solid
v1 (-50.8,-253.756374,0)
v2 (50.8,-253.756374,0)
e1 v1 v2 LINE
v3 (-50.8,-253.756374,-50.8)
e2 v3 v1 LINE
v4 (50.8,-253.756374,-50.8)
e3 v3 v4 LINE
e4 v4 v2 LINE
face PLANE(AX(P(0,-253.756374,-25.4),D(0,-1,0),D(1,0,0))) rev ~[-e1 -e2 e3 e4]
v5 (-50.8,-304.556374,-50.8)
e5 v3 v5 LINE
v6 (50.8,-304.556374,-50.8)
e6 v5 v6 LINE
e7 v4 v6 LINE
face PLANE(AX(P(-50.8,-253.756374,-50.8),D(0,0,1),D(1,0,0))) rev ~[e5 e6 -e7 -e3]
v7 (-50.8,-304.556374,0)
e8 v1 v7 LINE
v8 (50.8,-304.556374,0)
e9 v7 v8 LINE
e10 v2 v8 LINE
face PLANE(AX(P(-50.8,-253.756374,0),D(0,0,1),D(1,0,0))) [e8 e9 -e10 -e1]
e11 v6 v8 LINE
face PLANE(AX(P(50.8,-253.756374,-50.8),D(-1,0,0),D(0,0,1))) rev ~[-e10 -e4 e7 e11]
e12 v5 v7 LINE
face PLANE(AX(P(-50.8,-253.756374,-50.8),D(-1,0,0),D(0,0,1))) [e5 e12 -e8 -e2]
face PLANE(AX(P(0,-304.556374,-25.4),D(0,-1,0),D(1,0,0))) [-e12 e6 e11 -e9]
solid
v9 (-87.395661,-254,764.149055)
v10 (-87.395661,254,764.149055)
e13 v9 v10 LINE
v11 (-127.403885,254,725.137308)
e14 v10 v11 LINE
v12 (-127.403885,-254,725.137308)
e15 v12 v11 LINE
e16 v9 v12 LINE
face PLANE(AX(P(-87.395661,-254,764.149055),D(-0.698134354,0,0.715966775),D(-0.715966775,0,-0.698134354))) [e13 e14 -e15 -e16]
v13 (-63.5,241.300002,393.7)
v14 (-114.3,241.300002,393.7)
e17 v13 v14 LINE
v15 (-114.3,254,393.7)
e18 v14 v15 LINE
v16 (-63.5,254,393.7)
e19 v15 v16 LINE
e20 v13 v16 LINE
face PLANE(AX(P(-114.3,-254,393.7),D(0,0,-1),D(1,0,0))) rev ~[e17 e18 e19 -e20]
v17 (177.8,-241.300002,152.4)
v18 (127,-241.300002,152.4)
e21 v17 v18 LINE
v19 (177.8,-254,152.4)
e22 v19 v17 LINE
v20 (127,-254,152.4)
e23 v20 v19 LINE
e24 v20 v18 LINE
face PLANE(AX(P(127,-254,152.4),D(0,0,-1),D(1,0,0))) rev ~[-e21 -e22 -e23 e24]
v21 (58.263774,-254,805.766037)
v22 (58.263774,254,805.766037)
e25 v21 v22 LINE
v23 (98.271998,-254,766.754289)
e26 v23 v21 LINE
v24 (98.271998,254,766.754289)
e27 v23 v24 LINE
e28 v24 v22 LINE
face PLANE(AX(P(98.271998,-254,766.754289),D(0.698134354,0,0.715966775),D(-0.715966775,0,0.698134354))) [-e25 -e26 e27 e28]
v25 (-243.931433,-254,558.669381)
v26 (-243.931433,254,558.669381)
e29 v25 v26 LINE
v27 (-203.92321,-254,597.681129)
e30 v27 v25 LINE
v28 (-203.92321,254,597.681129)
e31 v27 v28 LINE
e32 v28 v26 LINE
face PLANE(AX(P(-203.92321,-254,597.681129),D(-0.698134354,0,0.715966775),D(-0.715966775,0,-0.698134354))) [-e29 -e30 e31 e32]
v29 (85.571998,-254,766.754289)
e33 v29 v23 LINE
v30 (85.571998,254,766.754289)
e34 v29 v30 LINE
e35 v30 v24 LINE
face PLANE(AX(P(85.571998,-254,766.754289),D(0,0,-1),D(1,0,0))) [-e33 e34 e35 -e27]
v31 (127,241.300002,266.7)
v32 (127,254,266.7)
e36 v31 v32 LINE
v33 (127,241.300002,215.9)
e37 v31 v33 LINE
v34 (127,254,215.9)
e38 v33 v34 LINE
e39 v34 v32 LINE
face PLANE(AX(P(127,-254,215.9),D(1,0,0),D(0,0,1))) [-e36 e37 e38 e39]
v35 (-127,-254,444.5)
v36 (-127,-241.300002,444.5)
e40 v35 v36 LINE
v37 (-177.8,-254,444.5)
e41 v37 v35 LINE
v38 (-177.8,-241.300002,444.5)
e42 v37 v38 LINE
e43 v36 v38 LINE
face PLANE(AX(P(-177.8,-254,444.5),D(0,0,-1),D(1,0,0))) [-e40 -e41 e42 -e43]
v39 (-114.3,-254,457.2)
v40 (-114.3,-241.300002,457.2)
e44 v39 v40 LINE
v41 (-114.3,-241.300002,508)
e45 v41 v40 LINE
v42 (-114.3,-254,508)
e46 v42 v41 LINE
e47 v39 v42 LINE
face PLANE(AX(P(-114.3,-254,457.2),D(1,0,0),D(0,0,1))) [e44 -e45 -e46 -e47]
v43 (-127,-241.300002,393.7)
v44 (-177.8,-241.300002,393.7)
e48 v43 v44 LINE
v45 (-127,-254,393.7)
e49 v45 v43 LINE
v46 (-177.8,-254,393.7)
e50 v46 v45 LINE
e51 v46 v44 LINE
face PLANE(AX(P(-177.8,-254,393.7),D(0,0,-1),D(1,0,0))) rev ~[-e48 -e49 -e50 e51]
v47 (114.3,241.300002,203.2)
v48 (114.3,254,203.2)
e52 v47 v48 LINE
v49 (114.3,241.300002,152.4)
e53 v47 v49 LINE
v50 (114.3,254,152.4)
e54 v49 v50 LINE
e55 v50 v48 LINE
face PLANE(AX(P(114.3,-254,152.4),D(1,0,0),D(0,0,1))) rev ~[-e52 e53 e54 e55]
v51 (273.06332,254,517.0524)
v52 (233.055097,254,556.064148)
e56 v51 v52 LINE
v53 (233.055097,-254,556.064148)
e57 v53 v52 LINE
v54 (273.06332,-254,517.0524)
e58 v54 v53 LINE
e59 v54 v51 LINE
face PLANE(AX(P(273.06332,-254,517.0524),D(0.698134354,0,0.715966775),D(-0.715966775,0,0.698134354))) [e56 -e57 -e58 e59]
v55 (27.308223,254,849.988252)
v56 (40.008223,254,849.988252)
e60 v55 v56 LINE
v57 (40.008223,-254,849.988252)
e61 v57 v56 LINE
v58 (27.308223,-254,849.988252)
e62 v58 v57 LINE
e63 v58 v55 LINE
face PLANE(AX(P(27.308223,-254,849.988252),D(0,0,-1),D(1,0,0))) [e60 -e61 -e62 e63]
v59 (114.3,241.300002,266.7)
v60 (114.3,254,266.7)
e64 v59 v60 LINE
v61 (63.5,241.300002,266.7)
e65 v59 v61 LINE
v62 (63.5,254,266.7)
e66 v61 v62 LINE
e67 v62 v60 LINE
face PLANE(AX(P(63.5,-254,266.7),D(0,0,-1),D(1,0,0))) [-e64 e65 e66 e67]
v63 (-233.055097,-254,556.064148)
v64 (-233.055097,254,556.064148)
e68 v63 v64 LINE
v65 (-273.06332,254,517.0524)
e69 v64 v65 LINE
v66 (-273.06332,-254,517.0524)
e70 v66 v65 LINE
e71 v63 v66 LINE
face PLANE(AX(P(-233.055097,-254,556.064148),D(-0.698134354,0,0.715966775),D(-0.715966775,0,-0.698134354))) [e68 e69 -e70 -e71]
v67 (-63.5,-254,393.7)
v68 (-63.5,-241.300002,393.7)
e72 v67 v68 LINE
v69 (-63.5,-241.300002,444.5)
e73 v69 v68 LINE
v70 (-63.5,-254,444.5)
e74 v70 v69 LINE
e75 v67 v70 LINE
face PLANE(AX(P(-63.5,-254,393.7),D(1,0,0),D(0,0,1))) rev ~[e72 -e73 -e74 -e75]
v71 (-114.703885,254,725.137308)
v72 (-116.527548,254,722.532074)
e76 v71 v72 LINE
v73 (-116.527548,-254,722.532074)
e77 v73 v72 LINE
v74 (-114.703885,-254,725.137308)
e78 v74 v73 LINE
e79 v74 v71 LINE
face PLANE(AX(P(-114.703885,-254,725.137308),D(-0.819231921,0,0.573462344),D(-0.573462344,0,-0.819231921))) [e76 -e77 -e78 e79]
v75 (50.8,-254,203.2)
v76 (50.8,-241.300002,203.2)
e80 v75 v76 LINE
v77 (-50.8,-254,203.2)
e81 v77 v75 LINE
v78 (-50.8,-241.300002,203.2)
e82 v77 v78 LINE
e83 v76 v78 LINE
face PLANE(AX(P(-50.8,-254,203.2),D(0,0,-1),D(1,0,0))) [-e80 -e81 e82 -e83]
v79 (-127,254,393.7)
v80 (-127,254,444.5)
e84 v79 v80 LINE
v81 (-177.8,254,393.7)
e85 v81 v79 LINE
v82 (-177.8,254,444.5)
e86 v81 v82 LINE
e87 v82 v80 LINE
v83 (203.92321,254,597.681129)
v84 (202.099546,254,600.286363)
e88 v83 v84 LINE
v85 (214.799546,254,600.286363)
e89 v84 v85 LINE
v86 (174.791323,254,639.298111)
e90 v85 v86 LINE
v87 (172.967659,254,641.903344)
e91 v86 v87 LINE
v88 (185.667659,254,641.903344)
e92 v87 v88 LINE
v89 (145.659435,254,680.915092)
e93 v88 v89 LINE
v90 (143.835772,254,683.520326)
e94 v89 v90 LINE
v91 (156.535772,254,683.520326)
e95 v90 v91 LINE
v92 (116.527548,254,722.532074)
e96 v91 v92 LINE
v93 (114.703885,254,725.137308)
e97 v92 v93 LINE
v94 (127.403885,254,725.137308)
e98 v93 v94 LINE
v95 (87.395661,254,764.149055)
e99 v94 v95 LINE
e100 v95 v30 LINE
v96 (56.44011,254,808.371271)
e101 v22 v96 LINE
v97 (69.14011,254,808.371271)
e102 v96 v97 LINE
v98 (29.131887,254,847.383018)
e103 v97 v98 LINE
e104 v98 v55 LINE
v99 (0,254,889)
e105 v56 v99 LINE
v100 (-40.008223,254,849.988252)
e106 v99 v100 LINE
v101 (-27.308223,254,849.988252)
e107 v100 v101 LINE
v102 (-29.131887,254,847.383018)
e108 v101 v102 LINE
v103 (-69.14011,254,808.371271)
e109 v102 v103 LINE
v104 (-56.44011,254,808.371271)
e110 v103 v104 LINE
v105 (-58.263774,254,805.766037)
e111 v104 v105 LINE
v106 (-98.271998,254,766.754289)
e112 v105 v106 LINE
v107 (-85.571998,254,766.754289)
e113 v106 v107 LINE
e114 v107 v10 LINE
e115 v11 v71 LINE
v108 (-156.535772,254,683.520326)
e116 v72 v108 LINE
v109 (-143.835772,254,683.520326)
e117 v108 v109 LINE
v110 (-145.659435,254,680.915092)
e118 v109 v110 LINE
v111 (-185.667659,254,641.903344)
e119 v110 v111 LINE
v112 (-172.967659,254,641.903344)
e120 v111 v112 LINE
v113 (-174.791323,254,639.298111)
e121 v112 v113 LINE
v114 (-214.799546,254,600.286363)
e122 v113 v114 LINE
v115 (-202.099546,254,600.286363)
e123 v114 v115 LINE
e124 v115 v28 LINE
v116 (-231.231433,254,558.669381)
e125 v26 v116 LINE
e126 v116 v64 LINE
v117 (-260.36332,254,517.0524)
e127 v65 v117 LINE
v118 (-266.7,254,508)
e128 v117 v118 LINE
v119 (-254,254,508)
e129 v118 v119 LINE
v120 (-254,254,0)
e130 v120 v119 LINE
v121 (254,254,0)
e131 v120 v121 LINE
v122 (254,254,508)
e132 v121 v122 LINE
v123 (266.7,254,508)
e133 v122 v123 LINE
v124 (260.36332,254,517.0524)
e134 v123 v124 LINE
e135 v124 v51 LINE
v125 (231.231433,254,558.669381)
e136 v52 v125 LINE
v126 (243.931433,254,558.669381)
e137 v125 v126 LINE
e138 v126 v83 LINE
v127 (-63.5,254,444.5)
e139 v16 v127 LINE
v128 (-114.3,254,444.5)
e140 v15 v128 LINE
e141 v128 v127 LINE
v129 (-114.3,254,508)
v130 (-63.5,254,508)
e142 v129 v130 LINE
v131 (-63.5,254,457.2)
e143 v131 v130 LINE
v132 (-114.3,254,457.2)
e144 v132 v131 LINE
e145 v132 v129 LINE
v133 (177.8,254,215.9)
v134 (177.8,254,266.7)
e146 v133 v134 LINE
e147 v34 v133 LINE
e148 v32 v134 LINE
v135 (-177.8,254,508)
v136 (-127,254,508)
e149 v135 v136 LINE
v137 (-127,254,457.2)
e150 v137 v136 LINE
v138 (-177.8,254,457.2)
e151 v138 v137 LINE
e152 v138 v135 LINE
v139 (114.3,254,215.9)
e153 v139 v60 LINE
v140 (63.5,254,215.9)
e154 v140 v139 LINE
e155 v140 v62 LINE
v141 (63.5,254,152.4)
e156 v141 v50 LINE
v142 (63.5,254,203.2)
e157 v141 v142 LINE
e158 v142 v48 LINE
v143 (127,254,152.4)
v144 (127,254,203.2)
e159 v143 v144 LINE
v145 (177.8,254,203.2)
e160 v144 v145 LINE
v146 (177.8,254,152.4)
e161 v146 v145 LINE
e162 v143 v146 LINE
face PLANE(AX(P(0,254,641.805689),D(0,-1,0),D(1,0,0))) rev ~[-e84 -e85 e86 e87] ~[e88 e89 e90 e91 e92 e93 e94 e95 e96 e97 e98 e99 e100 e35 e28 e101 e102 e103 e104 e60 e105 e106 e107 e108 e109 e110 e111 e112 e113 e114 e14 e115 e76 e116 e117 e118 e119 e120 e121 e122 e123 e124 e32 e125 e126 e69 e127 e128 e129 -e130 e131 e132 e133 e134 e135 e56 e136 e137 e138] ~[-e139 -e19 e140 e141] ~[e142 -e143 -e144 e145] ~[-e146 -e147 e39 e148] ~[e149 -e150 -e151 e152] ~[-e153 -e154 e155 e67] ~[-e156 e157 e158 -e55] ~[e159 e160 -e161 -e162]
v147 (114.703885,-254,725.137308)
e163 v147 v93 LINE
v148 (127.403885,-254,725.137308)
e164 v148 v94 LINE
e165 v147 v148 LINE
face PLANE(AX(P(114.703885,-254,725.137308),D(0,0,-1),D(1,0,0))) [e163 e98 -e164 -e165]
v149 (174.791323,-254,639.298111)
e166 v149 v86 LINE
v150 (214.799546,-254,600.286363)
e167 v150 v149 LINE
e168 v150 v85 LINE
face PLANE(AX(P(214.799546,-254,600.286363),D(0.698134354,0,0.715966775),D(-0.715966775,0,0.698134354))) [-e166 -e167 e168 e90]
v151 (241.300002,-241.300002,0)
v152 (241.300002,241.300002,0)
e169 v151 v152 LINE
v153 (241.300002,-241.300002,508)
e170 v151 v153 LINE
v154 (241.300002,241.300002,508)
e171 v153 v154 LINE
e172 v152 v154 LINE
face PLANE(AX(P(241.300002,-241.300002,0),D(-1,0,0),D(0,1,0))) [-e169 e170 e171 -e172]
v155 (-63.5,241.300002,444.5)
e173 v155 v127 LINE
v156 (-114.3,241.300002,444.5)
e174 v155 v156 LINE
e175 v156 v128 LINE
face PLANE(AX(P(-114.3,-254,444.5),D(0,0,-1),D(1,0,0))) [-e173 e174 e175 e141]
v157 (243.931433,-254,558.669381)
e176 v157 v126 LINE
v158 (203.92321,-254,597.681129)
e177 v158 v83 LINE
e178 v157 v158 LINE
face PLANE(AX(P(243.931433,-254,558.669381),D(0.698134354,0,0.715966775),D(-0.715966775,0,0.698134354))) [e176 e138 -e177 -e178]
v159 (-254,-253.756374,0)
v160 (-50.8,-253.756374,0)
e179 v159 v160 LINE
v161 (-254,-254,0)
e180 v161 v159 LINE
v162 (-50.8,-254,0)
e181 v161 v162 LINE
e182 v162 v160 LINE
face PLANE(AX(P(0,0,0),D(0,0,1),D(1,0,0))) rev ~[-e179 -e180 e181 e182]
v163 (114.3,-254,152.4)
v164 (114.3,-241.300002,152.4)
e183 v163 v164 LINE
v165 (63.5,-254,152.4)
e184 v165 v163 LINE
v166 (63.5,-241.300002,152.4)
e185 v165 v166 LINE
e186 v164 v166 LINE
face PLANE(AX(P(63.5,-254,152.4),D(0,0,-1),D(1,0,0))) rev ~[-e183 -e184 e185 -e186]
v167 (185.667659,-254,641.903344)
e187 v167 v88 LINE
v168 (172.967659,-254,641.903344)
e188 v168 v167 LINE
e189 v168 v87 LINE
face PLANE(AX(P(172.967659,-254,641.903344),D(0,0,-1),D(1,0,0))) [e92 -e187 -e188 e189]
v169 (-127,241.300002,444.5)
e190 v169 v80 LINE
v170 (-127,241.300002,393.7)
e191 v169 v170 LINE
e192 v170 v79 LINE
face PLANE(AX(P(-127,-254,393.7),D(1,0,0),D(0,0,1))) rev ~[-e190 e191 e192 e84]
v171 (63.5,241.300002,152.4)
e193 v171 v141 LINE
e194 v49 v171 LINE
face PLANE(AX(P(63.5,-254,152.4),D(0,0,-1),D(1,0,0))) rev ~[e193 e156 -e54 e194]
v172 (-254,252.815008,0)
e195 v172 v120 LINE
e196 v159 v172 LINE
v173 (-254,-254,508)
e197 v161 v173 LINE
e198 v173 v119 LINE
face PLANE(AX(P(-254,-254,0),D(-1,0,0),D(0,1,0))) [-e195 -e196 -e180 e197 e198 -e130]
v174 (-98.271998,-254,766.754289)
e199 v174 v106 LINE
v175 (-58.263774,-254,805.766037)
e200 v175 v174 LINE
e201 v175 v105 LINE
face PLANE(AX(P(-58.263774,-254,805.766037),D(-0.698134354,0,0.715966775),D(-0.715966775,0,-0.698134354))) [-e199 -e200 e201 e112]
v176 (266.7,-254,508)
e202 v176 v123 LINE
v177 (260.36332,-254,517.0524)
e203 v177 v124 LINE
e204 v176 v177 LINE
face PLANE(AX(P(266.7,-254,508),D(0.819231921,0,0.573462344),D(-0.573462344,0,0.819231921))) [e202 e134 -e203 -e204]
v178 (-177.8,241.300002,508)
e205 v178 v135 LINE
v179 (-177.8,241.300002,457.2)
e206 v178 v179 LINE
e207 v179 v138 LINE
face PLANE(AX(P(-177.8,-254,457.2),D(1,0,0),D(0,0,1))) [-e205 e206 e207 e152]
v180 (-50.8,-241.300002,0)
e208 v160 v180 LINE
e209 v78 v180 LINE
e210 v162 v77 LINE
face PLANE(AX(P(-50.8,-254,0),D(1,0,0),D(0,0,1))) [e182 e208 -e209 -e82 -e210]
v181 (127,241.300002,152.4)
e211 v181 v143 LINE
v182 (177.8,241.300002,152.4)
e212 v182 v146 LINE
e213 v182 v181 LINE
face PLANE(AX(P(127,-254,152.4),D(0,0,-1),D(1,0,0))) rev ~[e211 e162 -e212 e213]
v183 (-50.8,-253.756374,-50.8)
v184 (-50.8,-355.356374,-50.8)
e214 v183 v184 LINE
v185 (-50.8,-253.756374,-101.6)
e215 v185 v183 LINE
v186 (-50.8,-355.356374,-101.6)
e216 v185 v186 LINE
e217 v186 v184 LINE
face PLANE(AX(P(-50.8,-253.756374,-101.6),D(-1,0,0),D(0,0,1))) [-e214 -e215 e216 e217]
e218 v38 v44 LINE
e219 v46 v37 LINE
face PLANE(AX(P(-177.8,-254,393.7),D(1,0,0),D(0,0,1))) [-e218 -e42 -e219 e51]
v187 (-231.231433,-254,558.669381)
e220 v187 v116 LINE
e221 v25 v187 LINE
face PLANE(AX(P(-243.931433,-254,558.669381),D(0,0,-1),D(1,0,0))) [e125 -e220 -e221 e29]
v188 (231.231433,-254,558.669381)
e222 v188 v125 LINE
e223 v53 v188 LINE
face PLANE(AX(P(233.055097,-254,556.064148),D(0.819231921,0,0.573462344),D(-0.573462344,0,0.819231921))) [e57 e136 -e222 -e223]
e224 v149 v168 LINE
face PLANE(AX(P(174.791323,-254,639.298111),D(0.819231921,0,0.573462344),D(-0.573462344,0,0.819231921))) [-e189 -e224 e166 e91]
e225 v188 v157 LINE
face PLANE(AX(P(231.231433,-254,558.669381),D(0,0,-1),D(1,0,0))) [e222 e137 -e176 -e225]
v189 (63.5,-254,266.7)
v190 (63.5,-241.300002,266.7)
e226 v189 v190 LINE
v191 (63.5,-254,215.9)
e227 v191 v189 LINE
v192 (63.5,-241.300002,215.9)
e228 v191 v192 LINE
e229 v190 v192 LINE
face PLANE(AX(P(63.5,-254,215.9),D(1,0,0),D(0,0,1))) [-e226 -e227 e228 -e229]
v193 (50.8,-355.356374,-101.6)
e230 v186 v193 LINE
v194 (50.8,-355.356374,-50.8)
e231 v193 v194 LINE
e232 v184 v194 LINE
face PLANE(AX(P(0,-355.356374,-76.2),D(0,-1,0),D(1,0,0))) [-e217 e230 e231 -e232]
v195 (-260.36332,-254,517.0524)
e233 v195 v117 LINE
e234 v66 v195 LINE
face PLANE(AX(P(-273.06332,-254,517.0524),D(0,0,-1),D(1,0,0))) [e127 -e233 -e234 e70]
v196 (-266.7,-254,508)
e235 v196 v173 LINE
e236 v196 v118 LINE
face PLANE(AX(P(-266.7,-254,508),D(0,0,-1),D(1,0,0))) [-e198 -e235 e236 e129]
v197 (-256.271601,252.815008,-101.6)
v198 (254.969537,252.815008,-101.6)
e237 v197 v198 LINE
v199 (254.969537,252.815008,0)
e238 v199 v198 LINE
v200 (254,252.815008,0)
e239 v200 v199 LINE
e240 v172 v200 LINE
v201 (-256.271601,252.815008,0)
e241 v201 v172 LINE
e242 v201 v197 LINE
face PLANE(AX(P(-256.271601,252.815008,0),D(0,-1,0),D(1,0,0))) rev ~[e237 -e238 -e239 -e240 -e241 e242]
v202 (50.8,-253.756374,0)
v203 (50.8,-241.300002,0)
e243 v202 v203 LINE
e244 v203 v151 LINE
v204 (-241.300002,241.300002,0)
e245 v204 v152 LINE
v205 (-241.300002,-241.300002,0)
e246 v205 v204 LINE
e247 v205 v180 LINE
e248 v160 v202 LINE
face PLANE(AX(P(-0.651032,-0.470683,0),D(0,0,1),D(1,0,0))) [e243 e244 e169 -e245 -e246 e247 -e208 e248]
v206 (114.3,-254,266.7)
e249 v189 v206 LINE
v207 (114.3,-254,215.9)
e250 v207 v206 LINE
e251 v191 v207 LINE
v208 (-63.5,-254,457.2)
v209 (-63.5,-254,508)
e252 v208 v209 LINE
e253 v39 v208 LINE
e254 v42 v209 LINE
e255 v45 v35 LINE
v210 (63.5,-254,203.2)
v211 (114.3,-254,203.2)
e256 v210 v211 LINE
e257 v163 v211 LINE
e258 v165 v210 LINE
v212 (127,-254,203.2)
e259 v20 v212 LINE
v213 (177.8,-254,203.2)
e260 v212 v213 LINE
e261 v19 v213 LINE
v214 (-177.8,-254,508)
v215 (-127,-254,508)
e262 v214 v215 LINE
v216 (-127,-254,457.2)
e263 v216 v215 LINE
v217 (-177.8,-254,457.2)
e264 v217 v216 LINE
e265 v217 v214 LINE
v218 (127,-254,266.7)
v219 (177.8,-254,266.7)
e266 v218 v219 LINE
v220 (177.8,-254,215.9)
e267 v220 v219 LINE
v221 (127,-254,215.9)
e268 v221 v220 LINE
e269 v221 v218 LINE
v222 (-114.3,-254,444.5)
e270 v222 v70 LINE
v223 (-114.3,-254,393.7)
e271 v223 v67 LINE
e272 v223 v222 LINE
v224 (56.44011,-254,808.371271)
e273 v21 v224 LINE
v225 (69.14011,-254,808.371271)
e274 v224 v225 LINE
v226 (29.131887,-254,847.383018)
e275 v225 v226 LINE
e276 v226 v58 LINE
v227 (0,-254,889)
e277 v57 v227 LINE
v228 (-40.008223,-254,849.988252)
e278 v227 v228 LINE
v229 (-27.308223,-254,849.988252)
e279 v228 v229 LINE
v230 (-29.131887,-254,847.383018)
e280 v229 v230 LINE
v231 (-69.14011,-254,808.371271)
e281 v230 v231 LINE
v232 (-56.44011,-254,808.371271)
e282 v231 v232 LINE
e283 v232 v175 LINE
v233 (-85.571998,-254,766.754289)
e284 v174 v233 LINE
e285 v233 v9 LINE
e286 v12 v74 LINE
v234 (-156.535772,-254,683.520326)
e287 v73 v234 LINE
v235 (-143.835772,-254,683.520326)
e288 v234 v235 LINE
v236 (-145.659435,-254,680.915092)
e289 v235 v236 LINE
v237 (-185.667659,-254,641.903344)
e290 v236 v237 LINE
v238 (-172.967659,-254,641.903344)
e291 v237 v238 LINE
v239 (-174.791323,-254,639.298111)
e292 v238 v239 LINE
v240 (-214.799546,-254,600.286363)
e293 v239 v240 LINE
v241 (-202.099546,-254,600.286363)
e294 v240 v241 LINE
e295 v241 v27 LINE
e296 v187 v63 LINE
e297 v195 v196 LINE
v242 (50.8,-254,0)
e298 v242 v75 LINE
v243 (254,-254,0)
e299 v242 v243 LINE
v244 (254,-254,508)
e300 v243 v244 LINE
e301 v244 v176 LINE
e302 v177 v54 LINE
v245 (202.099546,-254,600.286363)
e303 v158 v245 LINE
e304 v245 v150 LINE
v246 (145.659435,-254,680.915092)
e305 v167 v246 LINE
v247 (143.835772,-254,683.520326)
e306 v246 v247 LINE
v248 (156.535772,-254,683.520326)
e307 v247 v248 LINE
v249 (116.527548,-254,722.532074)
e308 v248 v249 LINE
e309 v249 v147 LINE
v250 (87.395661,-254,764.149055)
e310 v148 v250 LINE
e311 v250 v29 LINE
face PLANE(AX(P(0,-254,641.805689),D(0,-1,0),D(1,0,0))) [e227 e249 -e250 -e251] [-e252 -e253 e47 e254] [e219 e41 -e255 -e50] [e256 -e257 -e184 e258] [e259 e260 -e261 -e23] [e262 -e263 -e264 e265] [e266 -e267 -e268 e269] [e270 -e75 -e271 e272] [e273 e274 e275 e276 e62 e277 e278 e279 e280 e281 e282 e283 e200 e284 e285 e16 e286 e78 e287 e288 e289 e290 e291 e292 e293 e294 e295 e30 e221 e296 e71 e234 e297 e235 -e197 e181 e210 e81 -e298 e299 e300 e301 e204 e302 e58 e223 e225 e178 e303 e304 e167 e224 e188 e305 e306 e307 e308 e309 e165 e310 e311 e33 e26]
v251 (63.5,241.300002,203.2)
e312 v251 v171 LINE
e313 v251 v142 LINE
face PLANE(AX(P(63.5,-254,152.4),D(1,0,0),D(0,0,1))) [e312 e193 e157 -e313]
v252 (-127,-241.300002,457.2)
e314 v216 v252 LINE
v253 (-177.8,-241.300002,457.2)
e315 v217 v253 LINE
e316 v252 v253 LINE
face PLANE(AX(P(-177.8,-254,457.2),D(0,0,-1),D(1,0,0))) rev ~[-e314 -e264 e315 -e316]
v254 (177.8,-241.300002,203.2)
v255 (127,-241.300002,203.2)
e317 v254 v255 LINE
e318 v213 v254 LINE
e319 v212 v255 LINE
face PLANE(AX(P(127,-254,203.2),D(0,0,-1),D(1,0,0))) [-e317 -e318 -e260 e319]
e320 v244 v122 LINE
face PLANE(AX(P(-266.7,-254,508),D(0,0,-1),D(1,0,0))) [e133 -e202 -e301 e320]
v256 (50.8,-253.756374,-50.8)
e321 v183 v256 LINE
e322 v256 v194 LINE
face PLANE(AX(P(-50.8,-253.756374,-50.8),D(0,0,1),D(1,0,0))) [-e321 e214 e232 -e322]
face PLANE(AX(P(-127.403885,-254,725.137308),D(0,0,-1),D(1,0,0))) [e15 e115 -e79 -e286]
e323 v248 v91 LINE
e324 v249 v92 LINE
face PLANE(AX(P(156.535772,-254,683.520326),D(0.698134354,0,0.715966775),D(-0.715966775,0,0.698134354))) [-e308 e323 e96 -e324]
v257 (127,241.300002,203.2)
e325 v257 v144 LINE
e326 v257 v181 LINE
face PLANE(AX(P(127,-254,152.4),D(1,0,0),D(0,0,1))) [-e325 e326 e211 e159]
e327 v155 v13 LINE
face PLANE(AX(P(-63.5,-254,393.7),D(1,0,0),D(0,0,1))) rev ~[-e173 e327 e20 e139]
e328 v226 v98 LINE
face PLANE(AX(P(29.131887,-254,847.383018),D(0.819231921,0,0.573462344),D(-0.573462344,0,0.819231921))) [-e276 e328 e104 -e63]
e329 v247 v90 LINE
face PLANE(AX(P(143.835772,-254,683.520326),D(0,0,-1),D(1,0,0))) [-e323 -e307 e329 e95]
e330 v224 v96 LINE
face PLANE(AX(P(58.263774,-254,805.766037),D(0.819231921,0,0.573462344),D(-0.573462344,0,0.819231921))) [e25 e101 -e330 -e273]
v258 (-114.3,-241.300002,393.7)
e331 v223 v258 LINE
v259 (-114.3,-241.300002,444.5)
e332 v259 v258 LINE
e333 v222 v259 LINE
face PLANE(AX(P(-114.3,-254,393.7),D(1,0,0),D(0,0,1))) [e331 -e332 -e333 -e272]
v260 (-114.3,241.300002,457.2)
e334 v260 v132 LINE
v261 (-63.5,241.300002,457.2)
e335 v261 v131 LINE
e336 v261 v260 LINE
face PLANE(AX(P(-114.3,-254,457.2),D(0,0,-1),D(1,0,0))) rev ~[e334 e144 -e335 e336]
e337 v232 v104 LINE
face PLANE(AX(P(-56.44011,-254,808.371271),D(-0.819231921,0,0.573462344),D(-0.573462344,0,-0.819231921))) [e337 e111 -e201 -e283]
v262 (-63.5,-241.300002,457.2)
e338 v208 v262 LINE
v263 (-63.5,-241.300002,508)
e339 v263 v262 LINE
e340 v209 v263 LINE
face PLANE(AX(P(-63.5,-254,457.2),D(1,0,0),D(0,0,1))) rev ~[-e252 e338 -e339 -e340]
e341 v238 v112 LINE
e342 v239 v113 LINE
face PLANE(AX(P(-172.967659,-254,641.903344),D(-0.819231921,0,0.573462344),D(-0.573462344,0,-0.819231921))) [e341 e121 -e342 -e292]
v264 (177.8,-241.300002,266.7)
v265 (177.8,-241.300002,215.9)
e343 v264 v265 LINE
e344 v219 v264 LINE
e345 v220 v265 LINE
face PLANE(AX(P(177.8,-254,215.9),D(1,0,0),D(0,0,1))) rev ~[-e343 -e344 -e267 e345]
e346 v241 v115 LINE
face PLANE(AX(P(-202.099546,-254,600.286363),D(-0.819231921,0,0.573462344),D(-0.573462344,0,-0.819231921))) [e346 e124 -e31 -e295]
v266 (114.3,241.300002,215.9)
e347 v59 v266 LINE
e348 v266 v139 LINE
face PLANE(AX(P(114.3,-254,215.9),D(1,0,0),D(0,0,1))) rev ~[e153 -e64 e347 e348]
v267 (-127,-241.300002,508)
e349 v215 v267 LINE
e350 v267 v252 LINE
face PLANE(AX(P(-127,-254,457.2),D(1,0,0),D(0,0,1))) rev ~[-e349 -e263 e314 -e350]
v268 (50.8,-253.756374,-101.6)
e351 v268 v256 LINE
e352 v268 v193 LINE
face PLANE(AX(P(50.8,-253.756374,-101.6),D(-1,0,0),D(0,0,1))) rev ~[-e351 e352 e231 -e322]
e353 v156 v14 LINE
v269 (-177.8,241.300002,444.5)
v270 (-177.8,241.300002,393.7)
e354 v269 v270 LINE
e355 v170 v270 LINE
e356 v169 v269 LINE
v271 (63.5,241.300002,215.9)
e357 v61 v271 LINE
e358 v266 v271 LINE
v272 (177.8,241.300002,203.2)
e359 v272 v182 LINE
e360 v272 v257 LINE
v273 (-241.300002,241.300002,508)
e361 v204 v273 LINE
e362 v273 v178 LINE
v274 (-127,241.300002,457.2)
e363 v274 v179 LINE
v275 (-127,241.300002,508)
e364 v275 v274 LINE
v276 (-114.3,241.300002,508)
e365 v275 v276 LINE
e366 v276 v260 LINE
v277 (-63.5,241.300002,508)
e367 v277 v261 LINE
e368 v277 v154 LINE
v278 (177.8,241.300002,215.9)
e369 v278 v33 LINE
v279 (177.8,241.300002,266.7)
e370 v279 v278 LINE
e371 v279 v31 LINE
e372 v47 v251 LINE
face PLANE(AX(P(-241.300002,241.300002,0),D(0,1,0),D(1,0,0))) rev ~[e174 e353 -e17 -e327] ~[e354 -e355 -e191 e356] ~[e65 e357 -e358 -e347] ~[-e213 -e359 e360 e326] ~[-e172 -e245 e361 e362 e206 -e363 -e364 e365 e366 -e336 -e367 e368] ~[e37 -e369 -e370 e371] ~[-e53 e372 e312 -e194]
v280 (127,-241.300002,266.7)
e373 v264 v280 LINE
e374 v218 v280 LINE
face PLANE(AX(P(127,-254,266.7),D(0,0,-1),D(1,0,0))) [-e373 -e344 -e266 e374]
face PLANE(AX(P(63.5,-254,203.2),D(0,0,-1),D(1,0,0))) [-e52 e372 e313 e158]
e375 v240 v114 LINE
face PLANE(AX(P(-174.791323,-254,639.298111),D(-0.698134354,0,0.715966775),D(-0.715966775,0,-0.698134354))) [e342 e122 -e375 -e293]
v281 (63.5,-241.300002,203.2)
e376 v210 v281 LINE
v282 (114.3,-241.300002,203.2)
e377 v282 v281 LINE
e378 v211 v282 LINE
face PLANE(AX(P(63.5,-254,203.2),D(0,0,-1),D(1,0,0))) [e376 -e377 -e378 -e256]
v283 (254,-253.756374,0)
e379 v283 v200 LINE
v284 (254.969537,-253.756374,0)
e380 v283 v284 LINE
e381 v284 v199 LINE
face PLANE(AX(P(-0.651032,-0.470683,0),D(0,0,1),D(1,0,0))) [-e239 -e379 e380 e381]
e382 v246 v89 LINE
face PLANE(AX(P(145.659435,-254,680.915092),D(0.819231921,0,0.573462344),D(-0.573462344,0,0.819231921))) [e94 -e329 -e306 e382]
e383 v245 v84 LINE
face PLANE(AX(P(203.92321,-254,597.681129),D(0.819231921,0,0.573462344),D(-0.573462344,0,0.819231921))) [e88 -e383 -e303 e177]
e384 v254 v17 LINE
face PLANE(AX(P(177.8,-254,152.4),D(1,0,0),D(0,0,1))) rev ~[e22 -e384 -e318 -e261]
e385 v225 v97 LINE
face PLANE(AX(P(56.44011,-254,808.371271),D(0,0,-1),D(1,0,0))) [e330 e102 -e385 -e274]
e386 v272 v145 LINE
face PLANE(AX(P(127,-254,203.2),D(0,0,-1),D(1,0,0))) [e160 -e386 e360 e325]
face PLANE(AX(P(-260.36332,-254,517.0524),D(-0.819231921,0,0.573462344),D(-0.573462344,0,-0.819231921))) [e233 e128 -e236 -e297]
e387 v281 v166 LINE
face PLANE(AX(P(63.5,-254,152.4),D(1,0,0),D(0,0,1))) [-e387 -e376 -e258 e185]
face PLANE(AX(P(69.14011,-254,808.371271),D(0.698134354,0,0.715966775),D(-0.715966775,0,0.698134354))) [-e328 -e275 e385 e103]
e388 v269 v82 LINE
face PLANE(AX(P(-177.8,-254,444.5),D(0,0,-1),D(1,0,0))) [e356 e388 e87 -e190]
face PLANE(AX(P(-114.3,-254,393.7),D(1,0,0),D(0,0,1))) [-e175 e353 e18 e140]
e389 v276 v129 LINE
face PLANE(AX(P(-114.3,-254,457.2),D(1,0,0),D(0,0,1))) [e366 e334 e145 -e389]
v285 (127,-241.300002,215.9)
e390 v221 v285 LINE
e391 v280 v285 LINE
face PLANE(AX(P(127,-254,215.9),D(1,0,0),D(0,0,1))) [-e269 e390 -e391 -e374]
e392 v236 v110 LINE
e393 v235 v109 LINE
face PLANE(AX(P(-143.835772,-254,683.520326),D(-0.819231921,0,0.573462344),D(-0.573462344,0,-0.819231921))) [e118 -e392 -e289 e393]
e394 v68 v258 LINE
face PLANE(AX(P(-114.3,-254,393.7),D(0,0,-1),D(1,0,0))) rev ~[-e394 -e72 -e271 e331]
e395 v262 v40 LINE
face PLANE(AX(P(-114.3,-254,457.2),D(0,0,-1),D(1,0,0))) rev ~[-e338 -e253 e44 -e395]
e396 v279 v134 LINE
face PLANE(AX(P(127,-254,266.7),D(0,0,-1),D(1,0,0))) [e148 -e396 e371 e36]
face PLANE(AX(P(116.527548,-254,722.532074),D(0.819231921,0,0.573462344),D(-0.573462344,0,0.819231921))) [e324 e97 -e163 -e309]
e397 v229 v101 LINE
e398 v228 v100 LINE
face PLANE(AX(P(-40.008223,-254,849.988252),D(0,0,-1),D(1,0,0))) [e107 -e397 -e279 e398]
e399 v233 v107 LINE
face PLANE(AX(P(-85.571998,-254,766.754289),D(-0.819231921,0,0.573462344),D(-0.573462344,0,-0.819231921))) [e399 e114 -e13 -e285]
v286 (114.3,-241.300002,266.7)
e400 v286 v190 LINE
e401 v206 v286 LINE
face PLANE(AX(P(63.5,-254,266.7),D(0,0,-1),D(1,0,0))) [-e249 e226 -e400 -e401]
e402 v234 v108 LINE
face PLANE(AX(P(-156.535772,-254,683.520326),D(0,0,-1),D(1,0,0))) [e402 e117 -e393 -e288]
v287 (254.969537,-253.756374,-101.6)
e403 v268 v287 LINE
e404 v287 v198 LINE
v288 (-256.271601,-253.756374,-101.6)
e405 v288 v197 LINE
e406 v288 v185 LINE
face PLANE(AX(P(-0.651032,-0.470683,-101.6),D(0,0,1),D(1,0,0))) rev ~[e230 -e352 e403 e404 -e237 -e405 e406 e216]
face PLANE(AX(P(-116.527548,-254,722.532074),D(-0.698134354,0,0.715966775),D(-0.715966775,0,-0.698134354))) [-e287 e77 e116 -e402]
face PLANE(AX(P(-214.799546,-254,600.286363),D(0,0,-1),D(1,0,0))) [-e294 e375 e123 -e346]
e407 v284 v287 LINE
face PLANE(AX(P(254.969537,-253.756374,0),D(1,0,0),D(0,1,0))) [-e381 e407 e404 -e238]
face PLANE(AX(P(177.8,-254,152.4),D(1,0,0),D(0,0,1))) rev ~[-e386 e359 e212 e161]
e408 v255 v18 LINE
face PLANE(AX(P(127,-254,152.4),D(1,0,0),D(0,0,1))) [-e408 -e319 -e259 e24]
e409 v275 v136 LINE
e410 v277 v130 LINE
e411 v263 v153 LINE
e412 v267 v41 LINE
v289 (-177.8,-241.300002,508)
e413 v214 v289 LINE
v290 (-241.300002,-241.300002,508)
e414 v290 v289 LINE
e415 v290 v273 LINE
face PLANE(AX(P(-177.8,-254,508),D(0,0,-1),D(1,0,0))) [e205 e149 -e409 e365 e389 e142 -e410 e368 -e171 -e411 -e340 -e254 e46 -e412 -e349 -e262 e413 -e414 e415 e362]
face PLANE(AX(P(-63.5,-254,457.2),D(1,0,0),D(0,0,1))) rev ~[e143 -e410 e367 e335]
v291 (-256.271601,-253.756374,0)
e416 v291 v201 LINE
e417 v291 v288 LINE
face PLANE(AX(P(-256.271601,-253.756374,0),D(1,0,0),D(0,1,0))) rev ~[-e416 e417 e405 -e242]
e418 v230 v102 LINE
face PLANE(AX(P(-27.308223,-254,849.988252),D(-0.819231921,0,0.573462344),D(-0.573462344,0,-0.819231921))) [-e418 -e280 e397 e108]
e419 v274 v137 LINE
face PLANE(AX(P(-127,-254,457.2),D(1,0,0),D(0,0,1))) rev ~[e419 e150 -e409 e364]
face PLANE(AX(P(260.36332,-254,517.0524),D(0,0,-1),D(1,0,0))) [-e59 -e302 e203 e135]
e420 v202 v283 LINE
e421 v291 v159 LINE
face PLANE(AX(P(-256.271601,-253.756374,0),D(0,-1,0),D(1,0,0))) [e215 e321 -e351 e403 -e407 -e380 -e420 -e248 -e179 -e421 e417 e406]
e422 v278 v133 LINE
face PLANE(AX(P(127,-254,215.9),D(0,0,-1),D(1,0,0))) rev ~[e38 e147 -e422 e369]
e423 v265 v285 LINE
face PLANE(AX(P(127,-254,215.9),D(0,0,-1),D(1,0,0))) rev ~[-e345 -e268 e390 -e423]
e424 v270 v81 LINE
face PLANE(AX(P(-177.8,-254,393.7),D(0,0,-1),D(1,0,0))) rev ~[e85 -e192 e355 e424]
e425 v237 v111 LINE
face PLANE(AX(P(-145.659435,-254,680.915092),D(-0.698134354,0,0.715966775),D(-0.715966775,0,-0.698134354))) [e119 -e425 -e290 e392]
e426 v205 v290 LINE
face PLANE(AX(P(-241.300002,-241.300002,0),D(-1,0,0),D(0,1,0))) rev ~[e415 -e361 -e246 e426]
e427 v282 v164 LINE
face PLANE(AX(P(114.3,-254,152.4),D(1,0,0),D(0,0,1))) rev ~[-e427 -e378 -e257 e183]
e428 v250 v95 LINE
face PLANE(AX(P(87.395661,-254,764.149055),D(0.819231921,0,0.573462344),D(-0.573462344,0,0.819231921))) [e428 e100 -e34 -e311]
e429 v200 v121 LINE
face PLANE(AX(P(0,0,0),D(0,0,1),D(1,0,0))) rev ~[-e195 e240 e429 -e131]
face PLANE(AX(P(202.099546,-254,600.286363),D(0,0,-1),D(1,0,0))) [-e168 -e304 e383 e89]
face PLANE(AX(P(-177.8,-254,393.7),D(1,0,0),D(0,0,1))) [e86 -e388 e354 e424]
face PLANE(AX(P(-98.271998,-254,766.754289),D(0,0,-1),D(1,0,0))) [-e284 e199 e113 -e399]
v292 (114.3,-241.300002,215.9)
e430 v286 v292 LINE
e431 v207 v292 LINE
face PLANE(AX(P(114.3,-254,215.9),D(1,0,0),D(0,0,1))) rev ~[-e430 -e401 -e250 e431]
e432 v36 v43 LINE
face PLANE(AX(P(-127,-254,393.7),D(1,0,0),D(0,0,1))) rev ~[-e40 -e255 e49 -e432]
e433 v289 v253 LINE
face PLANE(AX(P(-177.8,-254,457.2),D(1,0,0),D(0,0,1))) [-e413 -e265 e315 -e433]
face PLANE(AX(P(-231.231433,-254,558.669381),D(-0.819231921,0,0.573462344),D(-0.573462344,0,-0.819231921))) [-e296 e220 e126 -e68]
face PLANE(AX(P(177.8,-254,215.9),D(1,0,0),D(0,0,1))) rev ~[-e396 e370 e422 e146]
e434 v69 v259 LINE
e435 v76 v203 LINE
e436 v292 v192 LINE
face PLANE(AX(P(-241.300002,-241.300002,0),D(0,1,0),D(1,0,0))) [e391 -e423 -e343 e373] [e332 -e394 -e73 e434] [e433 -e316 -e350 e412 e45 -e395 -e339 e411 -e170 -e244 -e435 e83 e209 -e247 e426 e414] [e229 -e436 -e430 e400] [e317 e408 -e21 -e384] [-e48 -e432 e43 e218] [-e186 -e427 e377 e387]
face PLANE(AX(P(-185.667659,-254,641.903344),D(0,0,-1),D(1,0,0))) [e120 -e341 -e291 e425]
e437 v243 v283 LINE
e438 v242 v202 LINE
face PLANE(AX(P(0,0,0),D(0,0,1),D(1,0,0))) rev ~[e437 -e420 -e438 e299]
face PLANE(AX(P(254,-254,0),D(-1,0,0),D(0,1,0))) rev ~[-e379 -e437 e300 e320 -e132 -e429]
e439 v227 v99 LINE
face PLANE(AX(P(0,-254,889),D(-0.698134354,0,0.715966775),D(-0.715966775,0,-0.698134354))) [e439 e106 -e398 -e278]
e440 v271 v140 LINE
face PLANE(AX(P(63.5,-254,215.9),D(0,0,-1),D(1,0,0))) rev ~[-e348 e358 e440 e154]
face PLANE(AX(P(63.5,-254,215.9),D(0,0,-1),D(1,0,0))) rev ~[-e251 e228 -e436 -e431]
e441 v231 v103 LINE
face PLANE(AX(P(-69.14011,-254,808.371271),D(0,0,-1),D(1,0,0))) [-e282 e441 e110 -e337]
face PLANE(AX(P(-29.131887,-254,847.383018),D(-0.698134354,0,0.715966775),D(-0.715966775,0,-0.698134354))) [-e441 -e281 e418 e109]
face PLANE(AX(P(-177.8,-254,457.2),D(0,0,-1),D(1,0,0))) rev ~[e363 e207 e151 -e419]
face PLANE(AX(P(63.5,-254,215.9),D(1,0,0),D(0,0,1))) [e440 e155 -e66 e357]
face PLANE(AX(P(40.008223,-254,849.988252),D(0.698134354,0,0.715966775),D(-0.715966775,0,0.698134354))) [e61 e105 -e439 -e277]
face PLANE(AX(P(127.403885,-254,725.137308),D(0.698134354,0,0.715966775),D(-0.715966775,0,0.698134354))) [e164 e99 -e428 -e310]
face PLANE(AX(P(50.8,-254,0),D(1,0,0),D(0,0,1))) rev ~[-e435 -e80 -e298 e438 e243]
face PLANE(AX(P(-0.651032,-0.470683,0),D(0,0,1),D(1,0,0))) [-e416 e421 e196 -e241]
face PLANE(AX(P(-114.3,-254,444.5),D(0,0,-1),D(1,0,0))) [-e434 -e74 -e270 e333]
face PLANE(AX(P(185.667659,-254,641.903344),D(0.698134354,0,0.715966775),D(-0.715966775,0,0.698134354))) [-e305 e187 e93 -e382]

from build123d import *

# Parameters (mm, degrees)
F0_W      = 508
F0_H      = 508
F0_W_2    = 482.6000034809
F0_H_2    = 482.6000034809
F1_DEPTH  = 508
F3_DEPTH  = 508
F4_W      = 50.8
F4_H      = 50.8
F5_DEPTH  = 734.06
F6_W      = 101.6
F6_H      = 203.2
F7_DEPTH  = 25.4
F10_W     = 511.2411379814
F10_H     = 506.5713822842
F11_DEPTH = 101.6
F12_W     = 101.6
F12_H     = 50.8
F13_DEPTH = 101.6
F14_W     = 101.6
F14_H     = 50.8
F15_DEPTH = 50.8


# Not quite as in the source:
# - the program builds the solid bodies; features that only make, move or delete a surface that nothing else refers to are left out


with BuildPart() as f1:
    # F0 (on Top) → F1 (new body)
    with BuildSketch(Plane.XY):
        Rectangle(F0_W, F0_H)
        Rectangle(F0_W_2, F0_H_2, mode=Mode.SUBTRACT)
    extrude(amount=F1_DEPTH)

    # F2 (on face) → F3 (join)
    with BuildSketch(Plane.XZ.offset(254)):
        Polygon((-260.3633201527, 517.0523997819), (-266.7, 508), (266.7, 508), (260.3633201527, 517.0523997819), (273.0633201527, 517.0523997819), (233.0550967493, 556.0641475011), (231.231433059, 558.6693813443), (243.931433059, 558.6693813443), (203.9232096556, 597.6811290634), (202.0995459654, 600.2863629066), (214.7995459654, 600.2863629066), (174.7913225619, 639.2981106258), (172.9676588717, 641.903344469), (185.6676588717, 641.903344469), (145.6594354683, 680.9150921882), (143.835771778, 683.5203260314), (156.535771778, 683.5203260314), (116.5275483746, 722.5320737505), (114.7038846844, 725.1373075937), (127.4038846844, 725.1373075937), (87.395661281, 764.1490553129), (85.5719975907, 766.7542891561), (98.2719975907, 766.7542891561), (58.2637741873, 805.7660368753), (56.4401104971, 808.3712707185), (69.1401104971, 808.3712707185), (29.1318870937, 847.3830184376), (27.3082234034, 849.9882522808), (40.0082234034, 849.9882522808), (0, 889), (-40.0082234034, 849.9882522808), (-27.3082234034, 849.9882522808), (-29.1318870937, 847.3830184376), (-69.1401104971, 808.3712707185), (-56.4401104971, 808.3712707185), (-58.2637741873, 805.7660368753), (-98.2719975907, 766.7542891561), (-85.5719975907, 766.7542891561), (-87.395661281, 764.1490553129), (-127.4038846844, 725.1373075937), (-114.7038846844, 725.1373075937), (-116.5275483746, 722.5320737505), (-156.535771778, 683.5203260314), (-143.835771778, 683.5203260314), (-145.6594354683, 680.9150921882), (-185.6676588717, 641.903344469), (-172.9676588717, 641.903344469), (-174.7913225619, 639.2981106258), (-214.7995459654, 600.2863629066), (-202.0995459654, 600.2863629066), (-203.9232096556, 597.6811290634), (-243.931433059, 558.6693813443), (-231.231433059, 558.6693813443), (-233.0550967493, 556.0641475011), (-273.0633201527, 517.0523997819), align=None)
    extrude(amount=-F3_DEPTH)

    # F4 (on face) → F5 (cut)
    with BuildSketch(Plane.XZ.offset(254)):
        with Locations((-88.9, 482.6)):
            Rectangle(F4_W, F4_H)
        with Locations((-152.4, 419.1)):
            Rectangle(F4_W, F4_H)
        with Locations((-88.9, 419.1)):
            Rectangle(F4_W, F4_H)
        with Locations((-152.4, 482.6)):
            Rectangle(F4_W, F4_H)
        with Locations((152.4, 241.3)):
            Rectangle(F4_W, F4_H)
        with Locations((88.9, 177.8)):
            Rectangle(F4_W, F4_H)
        with Locations((152.4, 177.8)):
            Rectangle(F4_W, F4_H)
        with Locations((88.9, 241.3)):
            Rectangle(F4_W, F4_H)
    extrude(amount=-F5_DEPTH, mode=Mode.SUBTRACT)

    # F6 (on face) → F7 (cut)
    with BuildSketch(Plane.XZ.offset(254)):
        with Locations((0, 101.6)):
            Rectangle(F6_W, F6_H)
    extrude(amount=-F7_DEPTH, mode=Mode.SUBTRACT)

    # F10 (on Top) → F11 (join)
    with BuildSketch(Plane.XY):
        with Locations((-0.6510317326, -0.4706829786)):
            Rectangle(F10_W, F10_H)
    extrude(amount=-F11_DEPTH)

    # F12 (on face) → F13 (join)
    with BuildSketch(Plane.XZ.offset(253.7563741207)):
        with Locations((0, -76.2)):
            Rectangle(F12_W, F12_H)
    extrude(amount=F13_DEPTH)


with BuildPart() as f15:
    # F14 (on face) → F15 (new body)
    with BuildSketch(Plane.XZ.offset(253.7563741207)):
        with Locations((0, -25.4)):
            Rectangle(F14_W, F14_H)
    extrude(amount=F15_DEPTH)


solid = Compound([f1.part, f15.part])
